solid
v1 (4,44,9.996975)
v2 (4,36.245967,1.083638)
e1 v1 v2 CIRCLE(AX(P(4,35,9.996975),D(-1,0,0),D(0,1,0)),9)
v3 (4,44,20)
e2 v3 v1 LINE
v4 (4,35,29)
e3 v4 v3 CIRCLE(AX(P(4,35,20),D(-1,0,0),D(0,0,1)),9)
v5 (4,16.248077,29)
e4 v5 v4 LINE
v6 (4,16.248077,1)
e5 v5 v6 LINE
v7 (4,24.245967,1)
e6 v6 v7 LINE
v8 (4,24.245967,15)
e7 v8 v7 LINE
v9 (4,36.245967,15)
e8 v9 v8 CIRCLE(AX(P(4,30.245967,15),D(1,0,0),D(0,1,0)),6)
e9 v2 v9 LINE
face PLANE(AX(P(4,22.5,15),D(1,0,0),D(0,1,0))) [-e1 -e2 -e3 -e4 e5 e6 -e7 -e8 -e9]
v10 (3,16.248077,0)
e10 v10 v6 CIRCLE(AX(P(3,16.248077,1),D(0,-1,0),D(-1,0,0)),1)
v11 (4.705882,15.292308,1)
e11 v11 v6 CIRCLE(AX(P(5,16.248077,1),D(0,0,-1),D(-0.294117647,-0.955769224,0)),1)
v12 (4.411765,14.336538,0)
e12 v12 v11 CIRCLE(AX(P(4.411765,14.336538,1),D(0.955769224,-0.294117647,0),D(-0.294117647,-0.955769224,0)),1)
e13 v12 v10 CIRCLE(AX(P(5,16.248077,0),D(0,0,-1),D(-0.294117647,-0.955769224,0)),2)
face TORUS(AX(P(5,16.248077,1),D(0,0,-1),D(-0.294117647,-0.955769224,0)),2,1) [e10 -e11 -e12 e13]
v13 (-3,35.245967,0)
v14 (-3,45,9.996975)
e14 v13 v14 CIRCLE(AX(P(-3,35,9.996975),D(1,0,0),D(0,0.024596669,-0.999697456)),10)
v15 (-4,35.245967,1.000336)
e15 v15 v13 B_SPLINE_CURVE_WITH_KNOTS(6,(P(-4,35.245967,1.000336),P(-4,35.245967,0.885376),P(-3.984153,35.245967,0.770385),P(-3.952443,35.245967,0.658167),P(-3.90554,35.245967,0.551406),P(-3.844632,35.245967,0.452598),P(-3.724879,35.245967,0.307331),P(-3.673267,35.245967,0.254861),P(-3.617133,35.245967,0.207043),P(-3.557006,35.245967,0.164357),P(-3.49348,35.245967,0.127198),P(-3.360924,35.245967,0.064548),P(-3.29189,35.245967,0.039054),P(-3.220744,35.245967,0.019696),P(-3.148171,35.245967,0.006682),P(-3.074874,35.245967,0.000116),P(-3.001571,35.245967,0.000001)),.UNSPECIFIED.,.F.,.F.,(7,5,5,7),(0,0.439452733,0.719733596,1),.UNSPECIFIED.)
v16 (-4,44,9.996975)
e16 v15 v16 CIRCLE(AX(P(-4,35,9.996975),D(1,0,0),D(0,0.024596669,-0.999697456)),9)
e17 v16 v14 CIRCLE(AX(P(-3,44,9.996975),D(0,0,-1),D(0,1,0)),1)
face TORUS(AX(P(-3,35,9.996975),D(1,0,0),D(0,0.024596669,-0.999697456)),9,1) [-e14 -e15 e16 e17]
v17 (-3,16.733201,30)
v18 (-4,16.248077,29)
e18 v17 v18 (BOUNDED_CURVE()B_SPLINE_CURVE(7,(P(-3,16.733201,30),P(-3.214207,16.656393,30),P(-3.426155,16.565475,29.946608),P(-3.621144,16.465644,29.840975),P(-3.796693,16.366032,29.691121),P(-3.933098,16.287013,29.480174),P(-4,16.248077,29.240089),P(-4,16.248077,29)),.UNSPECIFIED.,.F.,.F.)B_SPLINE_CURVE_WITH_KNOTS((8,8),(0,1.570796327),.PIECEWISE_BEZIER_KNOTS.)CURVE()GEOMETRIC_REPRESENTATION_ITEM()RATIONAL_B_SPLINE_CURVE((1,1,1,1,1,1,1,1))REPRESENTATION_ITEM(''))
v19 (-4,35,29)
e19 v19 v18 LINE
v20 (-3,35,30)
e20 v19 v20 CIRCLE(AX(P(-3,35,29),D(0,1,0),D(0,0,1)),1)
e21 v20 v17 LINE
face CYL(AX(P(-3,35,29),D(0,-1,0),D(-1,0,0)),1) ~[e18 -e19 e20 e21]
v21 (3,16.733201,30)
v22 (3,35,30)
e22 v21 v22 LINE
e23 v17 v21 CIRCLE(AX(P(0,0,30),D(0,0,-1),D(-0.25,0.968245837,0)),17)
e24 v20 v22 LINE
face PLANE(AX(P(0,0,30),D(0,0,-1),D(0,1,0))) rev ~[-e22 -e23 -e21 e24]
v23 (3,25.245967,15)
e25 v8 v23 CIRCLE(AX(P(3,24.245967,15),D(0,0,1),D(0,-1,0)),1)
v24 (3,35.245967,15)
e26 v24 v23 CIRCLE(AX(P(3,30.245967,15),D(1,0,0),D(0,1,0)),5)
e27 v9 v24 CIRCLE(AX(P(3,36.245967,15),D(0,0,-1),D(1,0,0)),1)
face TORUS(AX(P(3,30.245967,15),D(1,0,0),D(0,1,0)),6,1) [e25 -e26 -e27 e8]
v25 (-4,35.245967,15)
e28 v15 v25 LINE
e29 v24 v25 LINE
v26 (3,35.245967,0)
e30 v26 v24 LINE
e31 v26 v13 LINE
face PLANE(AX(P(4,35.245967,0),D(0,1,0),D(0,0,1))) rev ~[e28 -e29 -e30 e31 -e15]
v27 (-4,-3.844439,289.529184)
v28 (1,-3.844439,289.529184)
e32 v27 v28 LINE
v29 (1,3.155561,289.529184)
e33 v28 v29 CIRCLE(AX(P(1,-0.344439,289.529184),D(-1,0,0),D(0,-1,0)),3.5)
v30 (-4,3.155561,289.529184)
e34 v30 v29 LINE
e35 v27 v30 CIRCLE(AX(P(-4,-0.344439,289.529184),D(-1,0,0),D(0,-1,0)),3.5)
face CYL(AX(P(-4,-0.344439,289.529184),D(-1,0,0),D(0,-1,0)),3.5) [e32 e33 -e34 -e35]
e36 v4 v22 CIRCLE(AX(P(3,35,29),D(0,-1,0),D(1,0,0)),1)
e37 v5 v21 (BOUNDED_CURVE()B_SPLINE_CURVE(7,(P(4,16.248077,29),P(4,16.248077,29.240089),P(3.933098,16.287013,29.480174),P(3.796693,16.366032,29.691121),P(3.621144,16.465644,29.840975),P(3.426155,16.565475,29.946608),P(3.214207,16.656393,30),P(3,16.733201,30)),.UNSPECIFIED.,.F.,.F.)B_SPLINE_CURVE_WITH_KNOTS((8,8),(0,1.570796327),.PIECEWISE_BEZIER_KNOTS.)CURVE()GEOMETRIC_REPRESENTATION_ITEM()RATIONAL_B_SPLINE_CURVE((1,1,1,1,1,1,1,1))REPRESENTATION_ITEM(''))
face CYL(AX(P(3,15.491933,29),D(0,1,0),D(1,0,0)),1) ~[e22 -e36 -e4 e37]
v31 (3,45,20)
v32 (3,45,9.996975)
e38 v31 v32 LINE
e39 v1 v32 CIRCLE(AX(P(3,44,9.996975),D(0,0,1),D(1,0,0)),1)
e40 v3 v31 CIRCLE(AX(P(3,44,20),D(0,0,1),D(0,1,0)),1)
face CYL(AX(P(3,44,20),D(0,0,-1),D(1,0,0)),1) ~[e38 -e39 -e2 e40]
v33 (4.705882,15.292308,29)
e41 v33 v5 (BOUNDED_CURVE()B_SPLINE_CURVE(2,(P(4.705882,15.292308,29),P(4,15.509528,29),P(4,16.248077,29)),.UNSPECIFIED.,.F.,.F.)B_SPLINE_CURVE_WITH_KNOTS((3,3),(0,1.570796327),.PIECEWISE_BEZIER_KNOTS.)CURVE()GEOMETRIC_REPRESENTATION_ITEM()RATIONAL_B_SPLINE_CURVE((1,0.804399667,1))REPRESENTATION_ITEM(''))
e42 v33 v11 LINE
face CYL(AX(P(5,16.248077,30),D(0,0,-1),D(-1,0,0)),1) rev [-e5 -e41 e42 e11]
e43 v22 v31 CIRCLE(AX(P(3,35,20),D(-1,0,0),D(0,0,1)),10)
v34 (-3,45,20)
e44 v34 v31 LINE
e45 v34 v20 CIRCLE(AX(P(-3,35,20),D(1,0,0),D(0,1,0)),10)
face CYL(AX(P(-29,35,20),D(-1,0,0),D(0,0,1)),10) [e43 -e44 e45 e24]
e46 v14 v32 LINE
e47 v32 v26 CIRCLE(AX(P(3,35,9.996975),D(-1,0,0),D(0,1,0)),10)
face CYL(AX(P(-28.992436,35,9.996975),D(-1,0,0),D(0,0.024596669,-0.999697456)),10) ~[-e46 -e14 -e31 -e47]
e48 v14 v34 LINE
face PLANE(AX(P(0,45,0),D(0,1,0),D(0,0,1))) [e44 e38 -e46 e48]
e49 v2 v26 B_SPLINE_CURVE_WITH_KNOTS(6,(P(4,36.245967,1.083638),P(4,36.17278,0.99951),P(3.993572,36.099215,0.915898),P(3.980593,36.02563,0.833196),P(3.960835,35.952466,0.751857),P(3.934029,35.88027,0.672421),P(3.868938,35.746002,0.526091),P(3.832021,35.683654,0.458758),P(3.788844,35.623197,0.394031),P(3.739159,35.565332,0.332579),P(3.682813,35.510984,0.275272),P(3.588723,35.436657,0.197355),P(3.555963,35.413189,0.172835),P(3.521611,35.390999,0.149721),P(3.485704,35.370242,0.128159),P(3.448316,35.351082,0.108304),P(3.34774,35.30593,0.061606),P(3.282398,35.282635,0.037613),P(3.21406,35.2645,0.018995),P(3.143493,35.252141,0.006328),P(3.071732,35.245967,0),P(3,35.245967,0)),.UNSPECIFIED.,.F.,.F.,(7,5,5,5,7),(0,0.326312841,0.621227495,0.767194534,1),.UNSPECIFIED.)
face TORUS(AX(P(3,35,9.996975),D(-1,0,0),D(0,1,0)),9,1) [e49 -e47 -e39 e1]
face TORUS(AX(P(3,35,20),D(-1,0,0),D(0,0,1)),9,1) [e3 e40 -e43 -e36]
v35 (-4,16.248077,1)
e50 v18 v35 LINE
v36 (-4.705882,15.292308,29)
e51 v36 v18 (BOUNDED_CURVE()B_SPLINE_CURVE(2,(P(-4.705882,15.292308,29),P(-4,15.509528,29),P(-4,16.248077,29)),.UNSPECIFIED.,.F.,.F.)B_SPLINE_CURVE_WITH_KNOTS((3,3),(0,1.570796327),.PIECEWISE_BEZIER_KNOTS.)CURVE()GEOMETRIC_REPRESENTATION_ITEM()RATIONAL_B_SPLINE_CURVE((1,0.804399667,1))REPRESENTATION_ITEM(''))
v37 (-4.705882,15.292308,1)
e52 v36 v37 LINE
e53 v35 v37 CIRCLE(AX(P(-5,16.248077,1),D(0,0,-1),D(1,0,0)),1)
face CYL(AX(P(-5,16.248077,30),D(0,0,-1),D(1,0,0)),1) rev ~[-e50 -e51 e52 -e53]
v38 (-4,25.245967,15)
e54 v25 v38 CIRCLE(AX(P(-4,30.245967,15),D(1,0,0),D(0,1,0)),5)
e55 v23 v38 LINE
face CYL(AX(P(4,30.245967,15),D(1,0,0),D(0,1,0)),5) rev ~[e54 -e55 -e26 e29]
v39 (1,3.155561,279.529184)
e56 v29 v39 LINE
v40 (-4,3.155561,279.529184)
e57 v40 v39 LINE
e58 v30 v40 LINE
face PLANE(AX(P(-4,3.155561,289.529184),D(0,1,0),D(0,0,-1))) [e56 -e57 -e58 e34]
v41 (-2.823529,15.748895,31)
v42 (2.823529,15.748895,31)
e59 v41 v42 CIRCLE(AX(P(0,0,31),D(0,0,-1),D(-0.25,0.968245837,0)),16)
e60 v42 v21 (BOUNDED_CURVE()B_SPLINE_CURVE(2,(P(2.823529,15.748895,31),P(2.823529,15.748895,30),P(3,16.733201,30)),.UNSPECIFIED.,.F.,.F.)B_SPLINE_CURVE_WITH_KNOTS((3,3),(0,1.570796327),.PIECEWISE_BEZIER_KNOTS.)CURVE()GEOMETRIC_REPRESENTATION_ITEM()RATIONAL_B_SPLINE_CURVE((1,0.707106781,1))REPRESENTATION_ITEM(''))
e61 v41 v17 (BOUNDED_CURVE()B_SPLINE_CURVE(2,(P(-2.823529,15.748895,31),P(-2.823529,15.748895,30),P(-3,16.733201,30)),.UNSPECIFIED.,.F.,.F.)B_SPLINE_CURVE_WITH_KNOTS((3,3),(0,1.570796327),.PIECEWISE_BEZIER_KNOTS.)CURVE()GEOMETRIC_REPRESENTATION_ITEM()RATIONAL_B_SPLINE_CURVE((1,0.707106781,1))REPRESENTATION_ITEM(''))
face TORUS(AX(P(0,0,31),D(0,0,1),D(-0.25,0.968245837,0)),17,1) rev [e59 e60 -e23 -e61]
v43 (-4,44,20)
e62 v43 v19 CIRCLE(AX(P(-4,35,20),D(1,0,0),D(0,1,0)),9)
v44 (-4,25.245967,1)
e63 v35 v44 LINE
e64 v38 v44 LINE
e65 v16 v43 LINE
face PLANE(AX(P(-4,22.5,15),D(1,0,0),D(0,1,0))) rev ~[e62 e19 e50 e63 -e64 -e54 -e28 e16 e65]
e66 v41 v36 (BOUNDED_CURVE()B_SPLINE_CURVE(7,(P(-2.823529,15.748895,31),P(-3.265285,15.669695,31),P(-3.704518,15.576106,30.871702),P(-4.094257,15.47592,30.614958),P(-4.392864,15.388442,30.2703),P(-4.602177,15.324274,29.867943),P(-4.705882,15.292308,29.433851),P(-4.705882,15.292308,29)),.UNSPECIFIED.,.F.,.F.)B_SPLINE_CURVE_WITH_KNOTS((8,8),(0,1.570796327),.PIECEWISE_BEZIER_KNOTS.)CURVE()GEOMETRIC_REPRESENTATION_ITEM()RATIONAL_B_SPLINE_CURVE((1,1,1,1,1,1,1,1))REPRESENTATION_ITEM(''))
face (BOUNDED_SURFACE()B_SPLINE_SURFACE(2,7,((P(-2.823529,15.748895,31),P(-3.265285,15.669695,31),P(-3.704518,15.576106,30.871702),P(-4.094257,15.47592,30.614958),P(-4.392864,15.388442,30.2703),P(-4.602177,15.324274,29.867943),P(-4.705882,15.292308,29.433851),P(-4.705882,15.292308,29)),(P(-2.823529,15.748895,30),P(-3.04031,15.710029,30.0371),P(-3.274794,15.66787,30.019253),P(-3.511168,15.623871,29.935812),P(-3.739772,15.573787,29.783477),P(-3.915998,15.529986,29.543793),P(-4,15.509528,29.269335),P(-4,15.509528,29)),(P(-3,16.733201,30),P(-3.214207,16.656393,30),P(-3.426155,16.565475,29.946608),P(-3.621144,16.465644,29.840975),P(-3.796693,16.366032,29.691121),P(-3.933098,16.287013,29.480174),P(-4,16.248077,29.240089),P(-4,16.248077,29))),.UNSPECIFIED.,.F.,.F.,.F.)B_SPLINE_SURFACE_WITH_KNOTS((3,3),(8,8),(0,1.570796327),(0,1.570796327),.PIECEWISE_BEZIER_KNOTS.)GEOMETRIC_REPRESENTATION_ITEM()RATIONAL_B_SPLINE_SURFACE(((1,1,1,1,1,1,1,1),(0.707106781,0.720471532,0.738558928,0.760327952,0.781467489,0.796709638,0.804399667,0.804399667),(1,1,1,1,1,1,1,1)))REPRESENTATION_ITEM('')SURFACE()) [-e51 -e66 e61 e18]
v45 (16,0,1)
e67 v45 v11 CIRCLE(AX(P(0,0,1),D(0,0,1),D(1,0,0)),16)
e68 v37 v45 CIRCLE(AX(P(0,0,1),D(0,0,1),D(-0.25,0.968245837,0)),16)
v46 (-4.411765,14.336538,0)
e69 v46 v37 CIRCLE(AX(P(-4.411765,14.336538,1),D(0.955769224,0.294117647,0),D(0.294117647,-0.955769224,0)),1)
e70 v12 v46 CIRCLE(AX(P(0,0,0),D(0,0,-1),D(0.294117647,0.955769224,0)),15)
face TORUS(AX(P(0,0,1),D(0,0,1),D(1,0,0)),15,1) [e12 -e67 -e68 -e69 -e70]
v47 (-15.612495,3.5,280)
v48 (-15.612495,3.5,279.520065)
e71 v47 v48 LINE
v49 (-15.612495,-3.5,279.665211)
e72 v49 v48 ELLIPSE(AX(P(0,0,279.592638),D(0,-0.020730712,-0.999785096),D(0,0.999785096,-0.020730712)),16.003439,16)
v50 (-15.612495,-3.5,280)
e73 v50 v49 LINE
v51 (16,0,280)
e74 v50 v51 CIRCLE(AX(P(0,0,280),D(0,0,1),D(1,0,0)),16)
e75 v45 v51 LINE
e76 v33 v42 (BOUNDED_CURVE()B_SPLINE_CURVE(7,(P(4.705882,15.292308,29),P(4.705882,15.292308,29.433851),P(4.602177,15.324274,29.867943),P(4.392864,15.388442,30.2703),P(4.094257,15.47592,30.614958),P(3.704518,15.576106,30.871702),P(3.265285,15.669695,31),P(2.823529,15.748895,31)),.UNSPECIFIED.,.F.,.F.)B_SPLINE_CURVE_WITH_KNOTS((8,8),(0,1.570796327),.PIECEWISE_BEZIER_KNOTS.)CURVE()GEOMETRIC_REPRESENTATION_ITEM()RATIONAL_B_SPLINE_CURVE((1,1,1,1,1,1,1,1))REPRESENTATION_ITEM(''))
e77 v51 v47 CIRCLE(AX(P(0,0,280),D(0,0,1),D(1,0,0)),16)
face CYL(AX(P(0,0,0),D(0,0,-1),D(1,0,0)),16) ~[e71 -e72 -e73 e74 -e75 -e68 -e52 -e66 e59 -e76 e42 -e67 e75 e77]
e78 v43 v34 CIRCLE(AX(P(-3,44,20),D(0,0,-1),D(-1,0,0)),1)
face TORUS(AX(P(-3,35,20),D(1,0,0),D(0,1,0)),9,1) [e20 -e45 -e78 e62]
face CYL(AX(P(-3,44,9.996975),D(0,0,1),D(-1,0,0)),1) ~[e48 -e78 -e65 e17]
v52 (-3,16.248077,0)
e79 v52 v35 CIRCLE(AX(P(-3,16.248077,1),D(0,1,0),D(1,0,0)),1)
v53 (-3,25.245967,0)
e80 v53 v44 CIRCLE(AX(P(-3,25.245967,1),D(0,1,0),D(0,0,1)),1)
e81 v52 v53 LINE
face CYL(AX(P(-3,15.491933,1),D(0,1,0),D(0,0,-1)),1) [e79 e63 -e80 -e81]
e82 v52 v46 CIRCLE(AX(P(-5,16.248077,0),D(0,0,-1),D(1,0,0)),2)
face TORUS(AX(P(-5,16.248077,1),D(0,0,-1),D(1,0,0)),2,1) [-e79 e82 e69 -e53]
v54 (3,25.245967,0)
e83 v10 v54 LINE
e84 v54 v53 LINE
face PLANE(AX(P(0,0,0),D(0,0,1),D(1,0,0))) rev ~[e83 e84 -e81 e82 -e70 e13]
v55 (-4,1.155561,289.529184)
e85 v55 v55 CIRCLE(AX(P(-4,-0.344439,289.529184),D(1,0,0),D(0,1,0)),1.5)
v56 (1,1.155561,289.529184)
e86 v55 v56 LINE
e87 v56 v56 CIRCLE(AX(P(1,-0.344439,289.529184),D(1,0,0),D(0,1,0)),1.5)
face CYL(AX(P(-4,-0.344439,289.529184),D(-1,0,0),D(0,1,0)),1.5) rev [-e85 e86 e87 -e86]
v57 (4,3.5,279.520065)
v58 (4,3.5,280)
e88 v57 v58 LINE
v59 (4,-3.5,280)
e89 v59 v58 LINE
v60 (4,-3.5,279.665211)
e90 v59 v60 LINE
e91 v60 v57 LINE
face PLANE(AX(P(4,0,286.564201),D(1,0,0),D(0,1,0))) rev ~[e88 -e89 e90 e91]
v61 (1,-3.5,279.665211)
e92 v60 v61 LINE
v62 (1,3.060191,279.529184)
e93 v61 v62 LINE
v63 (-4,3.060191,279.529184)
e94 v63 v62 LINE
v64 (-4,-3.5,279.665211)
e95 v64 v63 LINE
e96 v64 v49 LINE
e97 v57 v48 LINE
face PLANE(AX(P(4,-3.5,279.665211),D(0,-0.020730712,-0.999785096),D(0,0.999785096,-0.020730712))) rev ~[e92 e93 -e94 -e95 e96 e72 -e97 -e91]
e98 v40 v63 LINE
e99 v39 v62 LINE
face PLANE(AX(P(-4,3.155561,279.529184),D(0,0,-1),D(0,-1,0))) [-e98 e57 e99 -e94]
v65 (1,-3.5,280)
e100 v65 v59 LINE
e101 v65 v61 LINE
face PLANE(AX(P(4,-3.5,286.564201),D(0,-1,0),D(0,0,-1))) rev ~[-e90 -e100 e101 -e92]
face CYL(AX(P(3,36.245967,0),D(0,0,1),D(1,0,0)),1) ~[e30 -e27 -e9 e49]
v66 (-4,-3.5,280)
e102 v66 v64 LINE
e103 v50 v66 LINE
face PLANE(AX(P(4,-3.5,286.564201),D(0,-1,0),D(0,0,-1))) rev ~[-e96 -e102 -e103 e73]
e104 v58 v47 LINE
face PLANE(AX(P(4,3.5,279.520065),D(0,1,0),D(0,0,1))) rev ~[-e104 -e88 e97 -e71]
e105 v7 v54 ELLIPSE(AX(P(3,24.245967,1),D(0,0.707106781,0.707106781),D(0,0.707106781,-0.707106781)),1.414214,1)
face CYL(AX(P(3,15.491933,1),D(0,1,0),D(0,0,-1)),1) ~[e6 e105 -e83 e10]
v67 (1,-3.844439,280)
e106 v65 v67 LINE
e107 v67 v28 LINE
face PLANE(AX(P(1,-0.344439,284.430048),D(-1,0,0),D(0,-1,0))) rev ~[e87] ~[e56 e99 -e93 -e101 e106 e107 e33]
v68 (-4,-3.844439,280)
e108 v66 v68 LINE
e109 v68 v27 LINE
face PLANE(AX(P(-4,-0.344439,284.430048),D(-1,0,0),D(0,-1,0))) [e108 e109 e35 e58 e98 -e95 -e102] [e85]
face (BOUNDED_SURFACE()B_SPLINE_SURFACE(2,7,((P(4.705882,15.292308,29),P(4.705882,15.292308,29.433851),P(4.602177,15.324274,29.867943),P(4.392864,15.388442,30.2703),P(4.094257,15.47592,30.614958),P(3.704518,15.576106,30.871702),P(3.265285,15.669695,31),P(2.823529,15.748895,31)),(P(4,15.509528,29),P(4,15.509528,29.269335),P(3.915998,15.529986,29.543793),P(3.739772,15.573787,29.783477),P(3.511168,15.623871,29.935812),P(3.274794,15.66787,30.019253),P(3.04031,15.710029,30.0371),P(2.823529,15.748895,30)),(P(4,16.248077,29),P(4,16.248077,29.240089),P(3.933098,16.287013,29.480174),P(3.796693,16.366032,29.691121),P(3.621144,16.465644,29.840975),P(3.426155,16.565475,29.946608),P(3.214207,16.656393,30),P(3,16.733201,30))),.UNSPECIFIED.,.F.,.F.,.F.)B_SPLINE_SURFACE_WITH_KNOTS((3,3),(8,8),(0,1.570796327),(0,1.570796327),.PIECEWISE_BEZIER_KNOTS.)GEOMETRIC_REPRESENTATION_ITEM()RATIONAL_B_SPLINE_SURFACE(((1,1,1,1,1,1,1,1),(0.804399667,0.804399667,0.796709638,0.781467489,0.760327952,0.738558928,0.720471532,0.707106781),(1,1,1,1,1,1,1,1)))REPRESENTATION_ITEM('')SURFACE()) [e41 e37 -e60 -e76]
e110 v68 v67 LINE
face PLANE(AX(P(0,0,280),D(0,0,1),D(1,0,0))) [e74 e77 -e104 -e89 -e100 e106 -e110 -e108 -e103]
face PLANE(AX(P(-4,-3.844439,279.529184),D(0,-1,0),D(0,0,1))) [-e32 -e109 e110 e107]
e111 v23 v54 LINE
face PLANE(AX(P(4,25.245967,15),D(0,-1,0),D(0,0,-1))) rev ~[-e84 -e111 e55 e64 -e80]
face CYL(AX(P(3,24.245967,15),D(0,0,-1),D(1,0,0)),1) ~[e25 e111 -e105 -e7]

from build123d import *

# Parameters (mm, degrees)
F0_R        = 16
F1_DEPTH    = 280
F2_W        = 45
F2_H        = 30
F3_DEPTH    = 4
F4_R        = 1.5
F5_DEPTH    = 25
F6_T1_DEPTH = 58
F6_T3_DEPTH = 57.9848728082
F7_R        = 1
F9_DEPTH    = 5


# Not quite as in the source:
# - a fillet or chamfer that OpenCascade refuses, or shapes differently, is made with other operations: its cross-section is extruded or revolved along the edge and cut away or added


with BuildPart() as f1:
    # F0 (on Top) → F1 (new body)
    with BuildSketch(Plane.XY):
        Circle(F0_R)
    extrude(amount=F1_DEPTH)

    # F2 (on Right) → F3 (join, symmetric)
    with BuildSketch(Plane.YZ):
        with Locations((22.5, 15)):
            Rectangle(F2_W, F2_H)
    extrude(amount=F3_DEPTH, both=True)

    # F4 (on face) → F5 (cut)
    with BuildSketch(Plane.YZ.offset(4)):
        with BuildLine():
            ThreePointArc((25.2459666924, 15), (30.2459666924, 10), (35.2459666924, 15))
            ThreePointArc((35.2459666924, 15), (30.2459666924, 20), (25.2459666924, 15))
        make_face()
        with BuildLine():
            ThreePointArc((-3.5, 286.5642011166), (0, 283.0642011166), (3.5, 286.5642011166))
            ThreePointArc((3.5, 286.5642011166), (0, 290.0642011166), (-3.5, 286.5642011166))
        make_face()
        with Locations((0, 286.5642011166)):
            Circle(F4_R, mode=Mode.SUBTRACT)
        with BuildLine():
            Line((3.5, 279.5200645924), (3.5, 286.5642011166))
            ThreePointArc((3.5, 286.5642011166), (0, 283.0642011166), (-3.5, 286.5642011166))
            Line((-3.5, 286.5642011166), (-3.5, 279.665210771))
            Line((-3.5, 279.665210771), (3.5, 279.5200645924))
        make_face()
        with BuildLine():
            Line((35.2459666924, 0), (35.2459666924, 15))
            ThreePointArc((35.2459666924, 15), (30.2459666924, 10), (25.2459666924, 15))
            Line((25.2459666924, 15), (25.2459666924, 0))
            Line((25.2459666924, 0), (35.2459666924, 0))
        make_face()
    extrude(amount=-F5_DEPTH, mode=Mode.SUBTRACT)

    # F6: fillet of radius 10 on 2 edges, made by hand

    # F6_s2 → F6_t1 (cut)
    with BuildSketch(Plane.YZ.offset(-29)):
        with BuildLine():
            ThreePointArc((35, 30), (42.0710678119, 27.0710678119), (45, 20))
            Line((45, 20), (45, 30))
            Line((45, 30), (35, 30))
        make_face()
    extrude(amount=F6_T1_DEPTH, mode=Mode.SUBTRACT)

    # F6_s4 → F6_t3 (cut)
    with BuildSketch(Plane.YZ.offset(-28.9924364041)):
        with BuildLine():
            ThreePointArc((35.2459666924, 0), (42.1575019009, 3.0134105333), (45, 9.9969745616))
            Line((45, 9.9969745616), (45, 0))
            Line((45, 0), (35.2459666924, 0))
        make_face()
    extrude(amount=F6_T3_DEPTH, mode=Mode.SUBTRACT)

    # F7
    f7_edges = [f1.edges().sort_by_distance(p)[0] for p in [
        (4, 42.071068, 27.071068),
        (-4, 45, 14.998487),
        (4, 35.245967, 7.5),
        (4, 30.245967, 20),
        (4, 25.245967, 7.5),
        (4, 20.36895, 0),
        (4, 15.491933, 15),
        (4, 25.245967, 30),
        (4, 45, 14.998487),
        (4, 42.157502, 3.013411),
        (12.649111, 9.797959, 0),
        (0, 16, 30),
        (-4, 15.491933, 15),
        (-9.797959, -12.649111, 0),
        (-4, 20.36895, 0),
        (-4, 25.245967, 30),
        (-4, 42.071068, 27.071068),
        (-4, 42.157502, 3.013411),
    ]]
    fillet(f7_edges, radius=F7_R)

    # F8 (on face) → F9 (join)
    with BuildSketch(Plane(origin=(-4, 0, 0), x_dir=(0, -1, 0), z_dir=(-1, 0, 0))):
        with BuildLine():
            Line((-3.1555609312, 289.529184103), (-3.1555609312, 279.529184103))
            Line((-3.1555609312, 279.529184103), (3.8444390688, 279.529184103))
            Line((3.8444390688, 279.529184103), (3.8444390688, 289.529184103))
            ThreePointArc((3.8444390688, 289.529184103), (0.3444390688, 286.029184103), (-3.1555609312, 289.529184103))
        make_face()
        with BuildLine():
            ThreePointArc((3.8444390688, 289.529184103), (0.3444390688, 293.029184103), (-3.1555609312, 289.529184103))
            Line((-3.1555609312, 289.529184103), (-1.1555609312, 289.529184103))
            ThreePointArc((-1.1555609312, 289.529184103), (0.3444390688, 291.029184103), (1.8444390688, 289.529184103))
            Line((1.8444390688, 289.529184103), (3.8444390688, 289.529184103))
        make_face()
        with BuildLine():
            Line((-1.1555609312, 289.529184103), (-3.1555609312, 289.529184103))
            ThreePointArc((-3.1555609312, 289.529184103), (0.3444390688, 286.029184103), (3.8444390688, 289.529184103))
            Line((3.8444390688, 289.529184103), (1.8444390688, 289.529184103))
            ThreePointArc((1.8444390688, 289.529184103), (0.3444390688, 288.029184103), (-1.1555609312, 289.529184103))
        make_face()
    extrude(amount=-F9_DEPTH)


solid = f1.part
